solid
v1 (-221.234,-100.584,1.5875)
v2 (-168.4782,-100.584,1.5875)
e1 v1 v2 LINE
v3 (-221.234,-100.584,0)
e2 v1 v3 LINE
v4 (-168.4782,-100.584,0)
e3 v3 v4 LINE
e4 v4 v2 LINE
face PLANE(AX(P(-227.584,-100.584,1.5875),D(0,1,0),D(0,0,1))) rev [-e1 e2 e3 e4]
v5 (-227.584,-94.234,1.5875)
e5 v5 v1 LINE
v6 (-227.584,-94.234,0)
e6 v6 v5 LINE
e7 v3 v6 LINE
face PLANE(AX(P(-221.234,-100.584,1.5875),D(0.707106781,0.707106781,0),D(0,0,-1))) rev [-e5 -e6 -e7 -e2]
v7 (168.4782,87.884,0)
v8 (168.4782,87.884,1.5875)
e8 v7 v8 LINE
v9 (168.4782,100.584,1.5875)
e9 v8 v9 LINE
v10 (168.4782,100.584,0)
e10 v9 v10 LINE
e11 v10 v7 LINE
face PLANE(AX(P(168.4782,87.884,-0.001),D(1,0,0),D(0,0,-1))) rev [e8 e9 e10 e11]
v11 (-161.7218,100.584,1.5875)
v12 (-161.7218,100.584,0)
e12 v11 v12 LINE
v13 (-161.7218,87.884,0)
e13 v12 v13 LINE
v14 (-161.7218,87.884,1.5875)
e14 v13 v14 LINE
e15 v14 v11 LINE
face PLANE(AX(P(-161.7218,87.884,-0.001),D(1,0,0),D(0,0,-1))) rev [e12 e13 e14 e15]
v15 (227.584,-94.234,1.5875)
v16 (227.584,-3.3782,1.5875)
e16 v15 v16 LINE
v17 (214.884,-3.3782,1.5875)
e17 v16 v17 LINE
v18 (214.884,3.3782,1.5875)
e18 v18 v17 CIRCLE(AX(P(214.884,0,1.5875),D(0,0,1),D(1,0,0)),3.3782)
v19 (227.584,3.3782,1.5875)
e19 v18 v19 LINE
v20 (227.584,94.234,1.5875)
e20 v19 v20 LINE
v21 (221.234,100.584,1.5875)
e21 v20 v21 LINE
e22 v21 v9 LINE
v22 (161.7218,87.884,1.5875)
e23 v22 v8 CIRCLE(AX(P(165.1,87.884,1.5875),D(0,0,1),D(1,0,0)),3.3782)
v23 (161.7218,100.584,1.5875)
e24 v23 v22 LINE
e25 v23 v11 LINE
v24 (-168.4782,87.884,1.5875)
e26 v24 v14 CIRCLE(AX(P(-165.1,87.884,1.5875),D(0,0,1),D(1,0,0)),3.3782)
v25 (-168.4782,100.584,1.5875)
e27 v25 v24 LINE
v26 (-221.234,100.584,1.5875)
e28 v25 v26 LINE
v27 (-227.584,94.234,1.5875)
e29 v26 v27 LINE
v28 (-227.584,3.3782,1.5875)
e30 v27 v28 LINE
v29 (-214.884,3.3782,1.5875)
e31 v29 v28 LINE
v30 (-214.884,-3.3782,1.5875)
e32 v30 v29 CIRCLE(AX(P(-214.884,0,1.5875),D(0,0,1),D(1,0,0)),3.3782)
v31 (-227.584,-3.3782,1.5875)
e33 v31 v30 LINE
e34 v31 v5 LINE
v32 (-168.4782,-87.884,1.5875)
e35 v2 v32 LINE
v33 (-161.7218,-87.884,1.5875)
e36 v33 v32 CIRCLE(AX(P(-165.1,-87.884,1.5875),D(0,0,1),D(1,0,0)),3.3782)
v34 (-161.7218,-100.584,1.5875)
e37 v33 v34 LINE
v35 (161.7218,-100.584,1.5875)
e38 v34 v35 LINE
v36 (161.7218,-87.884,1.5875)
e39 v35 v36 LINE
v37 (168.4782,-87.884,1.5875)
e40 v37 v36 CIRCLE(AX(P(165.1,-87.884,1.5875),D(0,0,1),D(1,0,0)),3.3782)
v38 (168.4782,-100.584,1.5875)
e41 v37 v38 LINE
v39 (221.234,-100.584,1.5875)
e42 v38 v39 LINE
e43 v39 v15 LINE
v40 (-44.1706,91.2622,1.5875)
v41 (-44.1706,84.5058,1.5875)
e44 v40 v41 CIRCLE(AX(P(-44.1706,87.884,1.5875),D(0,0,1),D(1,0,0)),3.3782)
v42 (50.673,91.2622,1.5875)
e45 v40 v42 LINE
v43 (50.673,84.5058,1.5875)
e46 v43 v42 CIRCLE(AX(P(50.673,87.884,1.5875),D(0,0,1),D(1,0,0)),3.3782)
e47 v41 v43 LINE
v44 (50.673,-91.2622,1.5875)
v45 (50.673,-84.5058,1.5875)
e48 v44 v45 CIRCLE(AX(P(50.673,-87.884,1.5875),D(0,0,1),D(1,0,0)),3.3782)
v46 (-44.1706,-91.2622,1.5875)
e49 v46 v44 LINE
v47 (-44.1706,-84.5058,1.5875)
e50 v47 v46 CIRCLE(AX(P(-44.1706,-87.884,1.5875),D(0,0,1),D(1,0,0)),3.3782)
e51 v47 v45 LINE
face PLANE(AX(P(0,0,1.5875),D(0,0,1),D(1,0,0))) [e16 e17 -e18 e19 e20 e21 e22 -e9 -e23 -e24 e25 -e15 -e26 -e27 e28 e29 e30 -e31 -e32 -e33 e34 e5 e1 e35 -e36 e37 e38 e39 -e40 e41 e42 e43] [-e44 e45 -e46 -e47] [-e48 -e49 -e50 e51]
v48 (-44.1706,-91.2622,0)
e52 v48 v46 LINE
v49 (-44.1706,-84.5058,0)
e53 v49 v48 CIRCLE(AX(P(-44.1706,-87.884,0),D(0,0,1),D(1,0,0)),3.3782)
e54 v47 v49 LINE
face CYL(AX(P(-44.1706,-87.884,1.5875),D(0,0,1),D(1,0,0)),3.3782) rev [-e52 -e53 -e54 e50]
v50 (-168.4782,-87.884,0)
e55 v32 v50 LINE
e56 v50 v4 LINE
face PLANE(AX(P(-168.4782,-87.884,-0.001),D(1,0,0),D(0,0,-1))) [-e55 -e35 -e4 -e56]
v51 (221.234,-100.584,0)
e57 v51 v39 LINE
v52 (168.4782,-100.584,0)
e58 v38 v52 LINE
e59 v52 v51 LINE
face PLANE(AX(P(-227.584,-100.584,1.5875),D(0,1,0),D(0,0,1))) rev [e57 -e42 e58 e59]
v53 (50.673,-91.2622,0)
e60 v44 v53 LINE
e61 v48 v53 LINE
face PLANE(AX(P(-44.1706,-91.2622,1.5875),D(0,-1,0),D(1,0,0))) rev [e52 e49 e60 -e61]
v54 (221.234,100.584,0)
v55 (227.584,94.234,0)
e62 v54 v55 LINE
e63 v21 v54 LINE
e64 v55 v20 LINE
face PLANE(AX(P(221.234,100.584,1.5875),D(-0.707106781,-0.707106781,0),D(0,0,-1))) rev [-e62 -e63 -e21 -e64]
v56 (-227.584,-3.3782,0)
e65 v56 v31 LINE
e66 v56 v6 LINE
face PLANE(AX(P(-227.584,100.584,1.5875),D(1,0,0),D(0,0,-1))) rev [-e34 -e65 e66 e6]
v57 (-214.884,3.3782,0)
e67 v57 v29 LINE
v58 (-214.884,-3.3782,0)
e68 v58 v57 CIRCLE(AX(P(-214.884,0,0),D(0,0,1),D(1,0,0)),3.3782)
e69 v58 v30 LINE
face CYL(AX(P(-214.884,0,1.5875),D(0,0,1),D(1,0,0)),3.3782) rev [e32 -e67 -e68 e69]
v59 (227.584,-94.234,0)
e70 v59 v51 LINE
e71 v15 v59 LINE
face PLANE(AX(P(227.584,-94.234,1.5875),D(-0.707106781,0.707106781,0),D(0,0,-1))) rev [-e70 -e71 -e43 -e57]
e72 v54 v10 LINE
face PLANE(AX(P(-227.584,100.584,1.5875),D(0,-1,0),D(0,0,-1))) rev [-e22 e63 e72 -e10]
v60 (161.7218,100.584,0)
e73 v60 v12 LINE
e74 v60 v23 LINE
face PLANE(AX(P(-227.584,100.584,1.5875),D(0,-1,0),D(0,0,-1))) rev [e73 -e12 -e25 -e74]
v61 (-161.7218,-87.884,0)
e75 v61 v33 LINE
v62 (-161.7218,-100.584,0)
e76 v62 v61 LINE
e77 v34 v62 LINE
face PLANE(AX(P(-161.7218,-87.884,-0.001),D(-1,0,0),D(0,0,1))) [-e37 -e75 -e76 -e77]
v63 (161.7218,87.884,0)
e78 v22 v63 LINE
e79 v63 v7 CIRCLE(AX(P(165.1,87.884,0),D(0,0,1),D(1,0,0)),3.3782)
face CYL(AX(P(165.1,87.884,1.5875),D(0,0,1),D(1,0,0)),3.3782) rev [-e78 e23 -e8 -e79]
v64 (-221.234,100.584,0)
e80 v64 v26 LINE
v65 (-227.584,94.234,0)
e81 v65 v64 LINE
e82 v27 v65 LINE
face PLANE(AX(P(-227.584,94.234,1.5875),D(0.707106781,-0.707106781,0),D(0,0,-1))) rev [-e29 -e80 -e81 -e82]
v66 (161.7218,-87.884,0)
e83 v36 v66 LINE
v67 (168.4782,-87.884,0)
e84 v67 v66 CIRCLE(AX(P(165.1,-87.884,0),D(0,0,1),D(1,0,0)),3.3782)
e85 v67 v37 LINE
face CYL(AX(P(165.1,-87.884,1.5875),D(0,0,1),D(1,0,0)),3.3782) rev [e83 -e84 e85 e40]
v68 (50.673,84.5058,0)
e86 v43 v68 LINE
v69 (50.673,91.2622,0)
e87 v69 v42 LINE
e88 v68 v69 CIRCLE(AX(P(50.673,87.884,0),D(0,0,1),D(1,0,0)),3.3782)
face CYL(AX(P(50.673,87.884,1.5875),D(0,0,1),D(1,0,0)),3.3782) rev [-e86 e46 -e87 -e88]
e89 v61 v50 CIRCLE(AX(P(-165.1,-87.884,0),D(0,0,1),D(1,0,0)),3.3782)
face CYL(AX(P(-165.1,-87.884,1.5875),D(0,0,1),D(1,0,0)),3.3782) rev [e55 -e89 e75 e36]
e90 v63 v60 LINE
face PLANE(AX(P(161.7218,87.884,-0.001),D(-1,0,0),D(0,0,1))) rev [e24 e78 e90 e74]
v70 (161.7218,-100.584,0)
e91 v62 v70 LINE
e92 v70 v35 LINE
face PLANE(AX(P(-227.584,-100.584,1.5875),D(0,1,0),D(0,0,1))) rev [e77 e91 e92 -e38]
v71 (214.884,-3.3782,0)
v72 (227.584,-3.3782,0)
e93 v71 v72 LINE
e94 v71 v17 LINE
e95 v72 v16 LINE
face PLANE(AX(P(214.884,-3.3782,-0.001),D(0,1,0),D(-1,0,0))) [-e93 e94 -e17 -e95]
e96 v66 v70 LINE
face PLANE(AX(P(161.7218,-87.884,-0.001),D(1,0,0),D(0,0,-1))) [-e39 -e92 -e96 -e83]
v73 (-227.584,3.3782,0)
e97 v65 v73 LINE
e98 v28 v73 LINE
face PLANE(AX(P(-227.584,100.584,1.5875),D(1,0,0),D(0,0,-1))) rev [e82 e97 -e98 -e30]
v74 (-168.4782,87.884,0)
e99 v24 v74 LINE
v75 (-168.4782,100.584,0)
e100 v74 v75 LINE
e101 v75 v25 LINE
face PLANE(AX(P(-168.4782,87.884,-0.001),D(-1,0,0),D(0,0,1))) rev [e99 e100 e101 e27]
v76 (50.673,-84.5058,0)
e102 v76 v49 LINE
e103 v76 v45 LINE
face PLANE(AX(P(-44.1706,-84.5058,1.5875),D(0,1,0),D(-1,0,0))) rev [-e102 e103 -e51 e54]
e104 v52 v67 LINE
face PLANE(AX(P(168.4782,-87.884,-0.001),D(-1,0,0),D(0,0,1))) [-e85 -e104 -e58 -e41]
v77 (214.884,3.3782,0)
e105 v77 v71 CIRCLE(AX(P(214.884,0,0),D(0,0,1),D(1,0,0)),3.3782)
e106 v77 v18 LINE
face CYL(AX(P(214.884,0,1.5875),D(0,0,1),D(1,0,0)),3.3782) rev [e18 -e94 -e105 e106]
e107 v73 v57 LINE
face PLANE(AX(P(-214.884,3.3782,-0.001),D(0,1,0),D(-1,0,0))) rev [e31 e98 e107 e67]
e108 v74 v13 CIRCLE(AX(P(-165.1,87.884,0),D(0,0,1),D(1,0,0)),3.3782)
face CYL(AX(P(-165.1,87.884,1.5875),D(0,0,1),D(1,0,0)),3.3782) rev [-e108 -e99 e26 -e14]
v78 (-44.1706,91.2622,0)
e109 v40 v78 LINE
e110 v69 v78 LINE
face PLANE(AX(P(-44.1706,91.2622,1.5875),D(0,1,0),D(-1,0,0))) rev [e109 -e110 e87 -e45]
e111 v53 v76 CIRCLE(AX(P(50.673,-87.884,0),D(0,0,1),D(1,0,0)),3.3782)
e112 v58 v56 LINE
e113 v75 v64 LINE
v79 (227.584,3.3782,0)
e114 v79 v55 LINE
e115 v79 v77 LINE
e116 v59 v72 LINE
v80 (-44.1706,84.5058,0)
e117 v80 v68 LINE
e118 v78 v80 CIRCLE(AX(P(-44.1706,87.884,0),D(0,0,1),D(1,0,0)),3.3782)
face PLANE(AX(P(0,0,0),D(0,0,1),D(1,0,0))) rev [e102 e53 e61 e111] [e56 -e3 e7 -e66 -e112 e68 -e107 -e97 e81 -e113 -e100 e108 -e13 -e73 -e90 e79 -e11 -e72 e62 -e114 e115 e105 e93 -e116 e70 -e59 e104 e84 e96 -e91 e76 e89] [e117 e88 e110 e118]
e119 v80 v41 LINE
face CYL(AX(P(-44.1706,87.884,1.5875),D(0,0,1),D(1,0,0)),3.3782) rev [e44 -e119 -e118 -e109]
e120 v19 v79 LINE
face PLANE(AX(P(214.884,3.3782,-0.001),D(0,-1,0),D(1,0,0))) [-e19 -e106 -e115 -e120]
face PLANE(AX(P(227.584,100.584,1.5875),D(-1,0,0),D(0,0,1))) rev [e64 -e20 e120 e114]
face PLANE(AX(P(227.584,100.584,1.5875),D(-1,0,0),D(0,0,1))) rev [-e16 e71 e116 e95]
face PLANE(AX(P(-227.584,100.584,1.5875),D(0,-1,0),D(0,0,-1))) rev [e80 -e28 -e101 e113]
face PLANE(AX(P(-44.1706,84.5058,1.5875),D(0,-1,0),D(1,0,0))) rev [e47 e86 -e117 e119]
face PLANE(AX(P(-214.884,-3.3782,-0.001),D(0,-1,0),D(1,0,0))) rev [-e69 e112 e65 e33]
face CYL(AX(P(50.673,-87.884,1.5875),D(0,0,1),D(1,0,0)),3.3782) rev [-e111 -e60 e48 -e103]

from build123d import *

# Parameters (mm, degrees)
SKETCH1_W                   = 455.168
SKETCH1_H                   = 201.168
BOSS_EXTRUDE1_DEPTH         = 1.5875
F_1_4_CLEARANCE_HOLE1_D     = 6.7564
F_1_4_CLEARANCE_SLOT1_DEPTH = 1.5875
CHAMFER1_SIZE               = 6.35
CUT_EXTRUDE1_REACH          = 250.826
SKETCH6_W                   = 6.7564
SKETCH6_H                   = 14.478
CUT_EXTRUDE2_REACH          = 250.826
SKETCH7_W                   = 14.478
SKETCH7_H                   = 6.7564


# Read off the part's stored shape, not the designer's step: 1/4 Clearance Slot1
with BuildPart() as part:
    # Sketch1 → Boss-Extrude1 (new body)
    with BuildSketch(Plane.XY):
        Rectangle(SKETCH1_W, SKETCH1_H)
    extrude(amount=BOSS_EXTRUDE1_DEPTH)

    # 1/4 Clearance Hole1 (through all)
    with Locations(Plane.XY.offset(1.5875)):
        with Locations((-165.1, 87.884), (165.1, 87.884), (214.884, 0), (-214.884, 0), (-165.1, -87.884), (165.1, -87.884)):
            Hole(F_1_4_CLEARANCE_HOLE1_D / 2)

    # 1/4 Clearance Slot1 outline → 1/4 Clearance Slot1 (cut)
    with BuildSketch(Plane.XY):
        with BuildLine():
            Line((-44.1706, 84.5058), (50.673, 84.5058))
            ThreePointArc((50.673, 84.5058), (54.0512, 87.884), (50.673, 91.2622))
            Line((50.673, 91.2622), (-44.1706, 91.2622))
            ThreePointArc((-44.1706, 91.2622), (-47.5488, 87.884), (-44.1706, 84.5058))
        make_face()
        with BuildLine():
            Line((-44.1706, -91.2622), (50.673, -91.2622))
            ThreePointArc((50.673, -91.2622), (54.0512, -87.884), (50.673, -84.5058))
            Line((50.673, -84.5058), (-44.1706, -84.5058))
            ThreePointArc((-44.1706, -84.5058), (-47.5488, -87.884), (-44.1706, -91.2622))
        make_face()
    extrude(amount=F_1_4_CLEARANCE_SLOT1_DEPTH, mode=Mode.SUBTRACT)

    # Chamfer1
    chamfer1_edges = [part.edges().sort_by_distance(p)[0] for p in [
        (227.584, -100.584, 0.79375),
        (-227.584, -100.584, 0.79375),
        (-227.584, 100.584, 0.79375),
        (227.584, 100.584, 0.79375),
    ]]
    chamfer(chamfer1_edges, length=CHAMFER1_SIZE)

    # Sketch6 → Cut-Extrude1 (cut, up to next)
    with BuildSketch(Plane.XY.offset(1.5875), mode=Mode.PRIVATE) as cut_extrude1_sk1:
        with Locations((-165.1, 95.123)):
            Rectangle(SKETCH6_W, SKETCH6_H)
    cut_extrude1_tool1 = extrude(cut_extrude1_sk1.sketch, amount=-CUT_EXTRUDE1_REACH, mode=Mode.PRIVATE) & part.part
    # Sketch6 → Cut-Extrude1 (cut, up to next)
    with BuildSketch(Plane.XY.offset(1.5875), mode=Mode.PRIVATE) as cut_extrude1_sk2:
        with Locations((165.1, 95.123)):
            Rectangle(SKETCH6_W, SKETCH6_H)
    cut_extrude1_tool2 = extrude(cut_extrude1_sk2.sketch, amount=-CUT_EXTRUDE1_REACH, mode=Mode.PRIVATE) & part.part
    cut_extrude1_1 = cut_extrude1_tool1.solids().sort_by_distance((-165.1, 95.123, 1.5875))[0]
    add(cut_extrude1_1, mode=Mode.SUBTRACT)
    cut_extrude1_2 = cut_extrude1_tool2.solids().sort_by_distance((165.1, 95.123, 1.5875))[0]
    add(cut_extrude1_2, mode=Mode.SUBTRACT)
    cut_extrude1 = cut_extrude1_1 + cut_extrude1_2  # Cut-Extrude1 as one shape, for the pattern or mirror that repeats it

    # Mirror1: Cut-Extrude1 across plane
    add(cut_extrude1.mirror(Plane.ZX), mode=Mode.SUBTRACT)

    # Sketch7 → Cut-Extrude2 (cut, up to next)
    with BuildSketch(Plane.XY.offset(1.5875), mode=Mode.PRIVATE) as cut_extrude2_sk1:
        with Locations((-222.123, 0)):
            Rectangle(SKETCH7_W, SKETCH7_H)
    cut_extrude2_tool1 = extrude(cut_extrude2_sk1.sketch, amount=-CUT_EXTRUDE2_REACH, mode=Mode.PRIVATE) & part.part
    cut_extrude2 = cut_extrude2_tool1.solids().sort_by_distance((-222.123, 0, 1.5875))[0]
    add(cut_extrude2, mode=Mode.SUBTRACT)

    # Mirror2: Cut-Extrude2 across plane
    add(cut_extrude2.mirror(Plane(origin=(0, 0, 0), x_dir=(0, 0, 1), z_dir=(1, 0, 0))), mode=Mode.SUBTRACT)


solid = part.part
